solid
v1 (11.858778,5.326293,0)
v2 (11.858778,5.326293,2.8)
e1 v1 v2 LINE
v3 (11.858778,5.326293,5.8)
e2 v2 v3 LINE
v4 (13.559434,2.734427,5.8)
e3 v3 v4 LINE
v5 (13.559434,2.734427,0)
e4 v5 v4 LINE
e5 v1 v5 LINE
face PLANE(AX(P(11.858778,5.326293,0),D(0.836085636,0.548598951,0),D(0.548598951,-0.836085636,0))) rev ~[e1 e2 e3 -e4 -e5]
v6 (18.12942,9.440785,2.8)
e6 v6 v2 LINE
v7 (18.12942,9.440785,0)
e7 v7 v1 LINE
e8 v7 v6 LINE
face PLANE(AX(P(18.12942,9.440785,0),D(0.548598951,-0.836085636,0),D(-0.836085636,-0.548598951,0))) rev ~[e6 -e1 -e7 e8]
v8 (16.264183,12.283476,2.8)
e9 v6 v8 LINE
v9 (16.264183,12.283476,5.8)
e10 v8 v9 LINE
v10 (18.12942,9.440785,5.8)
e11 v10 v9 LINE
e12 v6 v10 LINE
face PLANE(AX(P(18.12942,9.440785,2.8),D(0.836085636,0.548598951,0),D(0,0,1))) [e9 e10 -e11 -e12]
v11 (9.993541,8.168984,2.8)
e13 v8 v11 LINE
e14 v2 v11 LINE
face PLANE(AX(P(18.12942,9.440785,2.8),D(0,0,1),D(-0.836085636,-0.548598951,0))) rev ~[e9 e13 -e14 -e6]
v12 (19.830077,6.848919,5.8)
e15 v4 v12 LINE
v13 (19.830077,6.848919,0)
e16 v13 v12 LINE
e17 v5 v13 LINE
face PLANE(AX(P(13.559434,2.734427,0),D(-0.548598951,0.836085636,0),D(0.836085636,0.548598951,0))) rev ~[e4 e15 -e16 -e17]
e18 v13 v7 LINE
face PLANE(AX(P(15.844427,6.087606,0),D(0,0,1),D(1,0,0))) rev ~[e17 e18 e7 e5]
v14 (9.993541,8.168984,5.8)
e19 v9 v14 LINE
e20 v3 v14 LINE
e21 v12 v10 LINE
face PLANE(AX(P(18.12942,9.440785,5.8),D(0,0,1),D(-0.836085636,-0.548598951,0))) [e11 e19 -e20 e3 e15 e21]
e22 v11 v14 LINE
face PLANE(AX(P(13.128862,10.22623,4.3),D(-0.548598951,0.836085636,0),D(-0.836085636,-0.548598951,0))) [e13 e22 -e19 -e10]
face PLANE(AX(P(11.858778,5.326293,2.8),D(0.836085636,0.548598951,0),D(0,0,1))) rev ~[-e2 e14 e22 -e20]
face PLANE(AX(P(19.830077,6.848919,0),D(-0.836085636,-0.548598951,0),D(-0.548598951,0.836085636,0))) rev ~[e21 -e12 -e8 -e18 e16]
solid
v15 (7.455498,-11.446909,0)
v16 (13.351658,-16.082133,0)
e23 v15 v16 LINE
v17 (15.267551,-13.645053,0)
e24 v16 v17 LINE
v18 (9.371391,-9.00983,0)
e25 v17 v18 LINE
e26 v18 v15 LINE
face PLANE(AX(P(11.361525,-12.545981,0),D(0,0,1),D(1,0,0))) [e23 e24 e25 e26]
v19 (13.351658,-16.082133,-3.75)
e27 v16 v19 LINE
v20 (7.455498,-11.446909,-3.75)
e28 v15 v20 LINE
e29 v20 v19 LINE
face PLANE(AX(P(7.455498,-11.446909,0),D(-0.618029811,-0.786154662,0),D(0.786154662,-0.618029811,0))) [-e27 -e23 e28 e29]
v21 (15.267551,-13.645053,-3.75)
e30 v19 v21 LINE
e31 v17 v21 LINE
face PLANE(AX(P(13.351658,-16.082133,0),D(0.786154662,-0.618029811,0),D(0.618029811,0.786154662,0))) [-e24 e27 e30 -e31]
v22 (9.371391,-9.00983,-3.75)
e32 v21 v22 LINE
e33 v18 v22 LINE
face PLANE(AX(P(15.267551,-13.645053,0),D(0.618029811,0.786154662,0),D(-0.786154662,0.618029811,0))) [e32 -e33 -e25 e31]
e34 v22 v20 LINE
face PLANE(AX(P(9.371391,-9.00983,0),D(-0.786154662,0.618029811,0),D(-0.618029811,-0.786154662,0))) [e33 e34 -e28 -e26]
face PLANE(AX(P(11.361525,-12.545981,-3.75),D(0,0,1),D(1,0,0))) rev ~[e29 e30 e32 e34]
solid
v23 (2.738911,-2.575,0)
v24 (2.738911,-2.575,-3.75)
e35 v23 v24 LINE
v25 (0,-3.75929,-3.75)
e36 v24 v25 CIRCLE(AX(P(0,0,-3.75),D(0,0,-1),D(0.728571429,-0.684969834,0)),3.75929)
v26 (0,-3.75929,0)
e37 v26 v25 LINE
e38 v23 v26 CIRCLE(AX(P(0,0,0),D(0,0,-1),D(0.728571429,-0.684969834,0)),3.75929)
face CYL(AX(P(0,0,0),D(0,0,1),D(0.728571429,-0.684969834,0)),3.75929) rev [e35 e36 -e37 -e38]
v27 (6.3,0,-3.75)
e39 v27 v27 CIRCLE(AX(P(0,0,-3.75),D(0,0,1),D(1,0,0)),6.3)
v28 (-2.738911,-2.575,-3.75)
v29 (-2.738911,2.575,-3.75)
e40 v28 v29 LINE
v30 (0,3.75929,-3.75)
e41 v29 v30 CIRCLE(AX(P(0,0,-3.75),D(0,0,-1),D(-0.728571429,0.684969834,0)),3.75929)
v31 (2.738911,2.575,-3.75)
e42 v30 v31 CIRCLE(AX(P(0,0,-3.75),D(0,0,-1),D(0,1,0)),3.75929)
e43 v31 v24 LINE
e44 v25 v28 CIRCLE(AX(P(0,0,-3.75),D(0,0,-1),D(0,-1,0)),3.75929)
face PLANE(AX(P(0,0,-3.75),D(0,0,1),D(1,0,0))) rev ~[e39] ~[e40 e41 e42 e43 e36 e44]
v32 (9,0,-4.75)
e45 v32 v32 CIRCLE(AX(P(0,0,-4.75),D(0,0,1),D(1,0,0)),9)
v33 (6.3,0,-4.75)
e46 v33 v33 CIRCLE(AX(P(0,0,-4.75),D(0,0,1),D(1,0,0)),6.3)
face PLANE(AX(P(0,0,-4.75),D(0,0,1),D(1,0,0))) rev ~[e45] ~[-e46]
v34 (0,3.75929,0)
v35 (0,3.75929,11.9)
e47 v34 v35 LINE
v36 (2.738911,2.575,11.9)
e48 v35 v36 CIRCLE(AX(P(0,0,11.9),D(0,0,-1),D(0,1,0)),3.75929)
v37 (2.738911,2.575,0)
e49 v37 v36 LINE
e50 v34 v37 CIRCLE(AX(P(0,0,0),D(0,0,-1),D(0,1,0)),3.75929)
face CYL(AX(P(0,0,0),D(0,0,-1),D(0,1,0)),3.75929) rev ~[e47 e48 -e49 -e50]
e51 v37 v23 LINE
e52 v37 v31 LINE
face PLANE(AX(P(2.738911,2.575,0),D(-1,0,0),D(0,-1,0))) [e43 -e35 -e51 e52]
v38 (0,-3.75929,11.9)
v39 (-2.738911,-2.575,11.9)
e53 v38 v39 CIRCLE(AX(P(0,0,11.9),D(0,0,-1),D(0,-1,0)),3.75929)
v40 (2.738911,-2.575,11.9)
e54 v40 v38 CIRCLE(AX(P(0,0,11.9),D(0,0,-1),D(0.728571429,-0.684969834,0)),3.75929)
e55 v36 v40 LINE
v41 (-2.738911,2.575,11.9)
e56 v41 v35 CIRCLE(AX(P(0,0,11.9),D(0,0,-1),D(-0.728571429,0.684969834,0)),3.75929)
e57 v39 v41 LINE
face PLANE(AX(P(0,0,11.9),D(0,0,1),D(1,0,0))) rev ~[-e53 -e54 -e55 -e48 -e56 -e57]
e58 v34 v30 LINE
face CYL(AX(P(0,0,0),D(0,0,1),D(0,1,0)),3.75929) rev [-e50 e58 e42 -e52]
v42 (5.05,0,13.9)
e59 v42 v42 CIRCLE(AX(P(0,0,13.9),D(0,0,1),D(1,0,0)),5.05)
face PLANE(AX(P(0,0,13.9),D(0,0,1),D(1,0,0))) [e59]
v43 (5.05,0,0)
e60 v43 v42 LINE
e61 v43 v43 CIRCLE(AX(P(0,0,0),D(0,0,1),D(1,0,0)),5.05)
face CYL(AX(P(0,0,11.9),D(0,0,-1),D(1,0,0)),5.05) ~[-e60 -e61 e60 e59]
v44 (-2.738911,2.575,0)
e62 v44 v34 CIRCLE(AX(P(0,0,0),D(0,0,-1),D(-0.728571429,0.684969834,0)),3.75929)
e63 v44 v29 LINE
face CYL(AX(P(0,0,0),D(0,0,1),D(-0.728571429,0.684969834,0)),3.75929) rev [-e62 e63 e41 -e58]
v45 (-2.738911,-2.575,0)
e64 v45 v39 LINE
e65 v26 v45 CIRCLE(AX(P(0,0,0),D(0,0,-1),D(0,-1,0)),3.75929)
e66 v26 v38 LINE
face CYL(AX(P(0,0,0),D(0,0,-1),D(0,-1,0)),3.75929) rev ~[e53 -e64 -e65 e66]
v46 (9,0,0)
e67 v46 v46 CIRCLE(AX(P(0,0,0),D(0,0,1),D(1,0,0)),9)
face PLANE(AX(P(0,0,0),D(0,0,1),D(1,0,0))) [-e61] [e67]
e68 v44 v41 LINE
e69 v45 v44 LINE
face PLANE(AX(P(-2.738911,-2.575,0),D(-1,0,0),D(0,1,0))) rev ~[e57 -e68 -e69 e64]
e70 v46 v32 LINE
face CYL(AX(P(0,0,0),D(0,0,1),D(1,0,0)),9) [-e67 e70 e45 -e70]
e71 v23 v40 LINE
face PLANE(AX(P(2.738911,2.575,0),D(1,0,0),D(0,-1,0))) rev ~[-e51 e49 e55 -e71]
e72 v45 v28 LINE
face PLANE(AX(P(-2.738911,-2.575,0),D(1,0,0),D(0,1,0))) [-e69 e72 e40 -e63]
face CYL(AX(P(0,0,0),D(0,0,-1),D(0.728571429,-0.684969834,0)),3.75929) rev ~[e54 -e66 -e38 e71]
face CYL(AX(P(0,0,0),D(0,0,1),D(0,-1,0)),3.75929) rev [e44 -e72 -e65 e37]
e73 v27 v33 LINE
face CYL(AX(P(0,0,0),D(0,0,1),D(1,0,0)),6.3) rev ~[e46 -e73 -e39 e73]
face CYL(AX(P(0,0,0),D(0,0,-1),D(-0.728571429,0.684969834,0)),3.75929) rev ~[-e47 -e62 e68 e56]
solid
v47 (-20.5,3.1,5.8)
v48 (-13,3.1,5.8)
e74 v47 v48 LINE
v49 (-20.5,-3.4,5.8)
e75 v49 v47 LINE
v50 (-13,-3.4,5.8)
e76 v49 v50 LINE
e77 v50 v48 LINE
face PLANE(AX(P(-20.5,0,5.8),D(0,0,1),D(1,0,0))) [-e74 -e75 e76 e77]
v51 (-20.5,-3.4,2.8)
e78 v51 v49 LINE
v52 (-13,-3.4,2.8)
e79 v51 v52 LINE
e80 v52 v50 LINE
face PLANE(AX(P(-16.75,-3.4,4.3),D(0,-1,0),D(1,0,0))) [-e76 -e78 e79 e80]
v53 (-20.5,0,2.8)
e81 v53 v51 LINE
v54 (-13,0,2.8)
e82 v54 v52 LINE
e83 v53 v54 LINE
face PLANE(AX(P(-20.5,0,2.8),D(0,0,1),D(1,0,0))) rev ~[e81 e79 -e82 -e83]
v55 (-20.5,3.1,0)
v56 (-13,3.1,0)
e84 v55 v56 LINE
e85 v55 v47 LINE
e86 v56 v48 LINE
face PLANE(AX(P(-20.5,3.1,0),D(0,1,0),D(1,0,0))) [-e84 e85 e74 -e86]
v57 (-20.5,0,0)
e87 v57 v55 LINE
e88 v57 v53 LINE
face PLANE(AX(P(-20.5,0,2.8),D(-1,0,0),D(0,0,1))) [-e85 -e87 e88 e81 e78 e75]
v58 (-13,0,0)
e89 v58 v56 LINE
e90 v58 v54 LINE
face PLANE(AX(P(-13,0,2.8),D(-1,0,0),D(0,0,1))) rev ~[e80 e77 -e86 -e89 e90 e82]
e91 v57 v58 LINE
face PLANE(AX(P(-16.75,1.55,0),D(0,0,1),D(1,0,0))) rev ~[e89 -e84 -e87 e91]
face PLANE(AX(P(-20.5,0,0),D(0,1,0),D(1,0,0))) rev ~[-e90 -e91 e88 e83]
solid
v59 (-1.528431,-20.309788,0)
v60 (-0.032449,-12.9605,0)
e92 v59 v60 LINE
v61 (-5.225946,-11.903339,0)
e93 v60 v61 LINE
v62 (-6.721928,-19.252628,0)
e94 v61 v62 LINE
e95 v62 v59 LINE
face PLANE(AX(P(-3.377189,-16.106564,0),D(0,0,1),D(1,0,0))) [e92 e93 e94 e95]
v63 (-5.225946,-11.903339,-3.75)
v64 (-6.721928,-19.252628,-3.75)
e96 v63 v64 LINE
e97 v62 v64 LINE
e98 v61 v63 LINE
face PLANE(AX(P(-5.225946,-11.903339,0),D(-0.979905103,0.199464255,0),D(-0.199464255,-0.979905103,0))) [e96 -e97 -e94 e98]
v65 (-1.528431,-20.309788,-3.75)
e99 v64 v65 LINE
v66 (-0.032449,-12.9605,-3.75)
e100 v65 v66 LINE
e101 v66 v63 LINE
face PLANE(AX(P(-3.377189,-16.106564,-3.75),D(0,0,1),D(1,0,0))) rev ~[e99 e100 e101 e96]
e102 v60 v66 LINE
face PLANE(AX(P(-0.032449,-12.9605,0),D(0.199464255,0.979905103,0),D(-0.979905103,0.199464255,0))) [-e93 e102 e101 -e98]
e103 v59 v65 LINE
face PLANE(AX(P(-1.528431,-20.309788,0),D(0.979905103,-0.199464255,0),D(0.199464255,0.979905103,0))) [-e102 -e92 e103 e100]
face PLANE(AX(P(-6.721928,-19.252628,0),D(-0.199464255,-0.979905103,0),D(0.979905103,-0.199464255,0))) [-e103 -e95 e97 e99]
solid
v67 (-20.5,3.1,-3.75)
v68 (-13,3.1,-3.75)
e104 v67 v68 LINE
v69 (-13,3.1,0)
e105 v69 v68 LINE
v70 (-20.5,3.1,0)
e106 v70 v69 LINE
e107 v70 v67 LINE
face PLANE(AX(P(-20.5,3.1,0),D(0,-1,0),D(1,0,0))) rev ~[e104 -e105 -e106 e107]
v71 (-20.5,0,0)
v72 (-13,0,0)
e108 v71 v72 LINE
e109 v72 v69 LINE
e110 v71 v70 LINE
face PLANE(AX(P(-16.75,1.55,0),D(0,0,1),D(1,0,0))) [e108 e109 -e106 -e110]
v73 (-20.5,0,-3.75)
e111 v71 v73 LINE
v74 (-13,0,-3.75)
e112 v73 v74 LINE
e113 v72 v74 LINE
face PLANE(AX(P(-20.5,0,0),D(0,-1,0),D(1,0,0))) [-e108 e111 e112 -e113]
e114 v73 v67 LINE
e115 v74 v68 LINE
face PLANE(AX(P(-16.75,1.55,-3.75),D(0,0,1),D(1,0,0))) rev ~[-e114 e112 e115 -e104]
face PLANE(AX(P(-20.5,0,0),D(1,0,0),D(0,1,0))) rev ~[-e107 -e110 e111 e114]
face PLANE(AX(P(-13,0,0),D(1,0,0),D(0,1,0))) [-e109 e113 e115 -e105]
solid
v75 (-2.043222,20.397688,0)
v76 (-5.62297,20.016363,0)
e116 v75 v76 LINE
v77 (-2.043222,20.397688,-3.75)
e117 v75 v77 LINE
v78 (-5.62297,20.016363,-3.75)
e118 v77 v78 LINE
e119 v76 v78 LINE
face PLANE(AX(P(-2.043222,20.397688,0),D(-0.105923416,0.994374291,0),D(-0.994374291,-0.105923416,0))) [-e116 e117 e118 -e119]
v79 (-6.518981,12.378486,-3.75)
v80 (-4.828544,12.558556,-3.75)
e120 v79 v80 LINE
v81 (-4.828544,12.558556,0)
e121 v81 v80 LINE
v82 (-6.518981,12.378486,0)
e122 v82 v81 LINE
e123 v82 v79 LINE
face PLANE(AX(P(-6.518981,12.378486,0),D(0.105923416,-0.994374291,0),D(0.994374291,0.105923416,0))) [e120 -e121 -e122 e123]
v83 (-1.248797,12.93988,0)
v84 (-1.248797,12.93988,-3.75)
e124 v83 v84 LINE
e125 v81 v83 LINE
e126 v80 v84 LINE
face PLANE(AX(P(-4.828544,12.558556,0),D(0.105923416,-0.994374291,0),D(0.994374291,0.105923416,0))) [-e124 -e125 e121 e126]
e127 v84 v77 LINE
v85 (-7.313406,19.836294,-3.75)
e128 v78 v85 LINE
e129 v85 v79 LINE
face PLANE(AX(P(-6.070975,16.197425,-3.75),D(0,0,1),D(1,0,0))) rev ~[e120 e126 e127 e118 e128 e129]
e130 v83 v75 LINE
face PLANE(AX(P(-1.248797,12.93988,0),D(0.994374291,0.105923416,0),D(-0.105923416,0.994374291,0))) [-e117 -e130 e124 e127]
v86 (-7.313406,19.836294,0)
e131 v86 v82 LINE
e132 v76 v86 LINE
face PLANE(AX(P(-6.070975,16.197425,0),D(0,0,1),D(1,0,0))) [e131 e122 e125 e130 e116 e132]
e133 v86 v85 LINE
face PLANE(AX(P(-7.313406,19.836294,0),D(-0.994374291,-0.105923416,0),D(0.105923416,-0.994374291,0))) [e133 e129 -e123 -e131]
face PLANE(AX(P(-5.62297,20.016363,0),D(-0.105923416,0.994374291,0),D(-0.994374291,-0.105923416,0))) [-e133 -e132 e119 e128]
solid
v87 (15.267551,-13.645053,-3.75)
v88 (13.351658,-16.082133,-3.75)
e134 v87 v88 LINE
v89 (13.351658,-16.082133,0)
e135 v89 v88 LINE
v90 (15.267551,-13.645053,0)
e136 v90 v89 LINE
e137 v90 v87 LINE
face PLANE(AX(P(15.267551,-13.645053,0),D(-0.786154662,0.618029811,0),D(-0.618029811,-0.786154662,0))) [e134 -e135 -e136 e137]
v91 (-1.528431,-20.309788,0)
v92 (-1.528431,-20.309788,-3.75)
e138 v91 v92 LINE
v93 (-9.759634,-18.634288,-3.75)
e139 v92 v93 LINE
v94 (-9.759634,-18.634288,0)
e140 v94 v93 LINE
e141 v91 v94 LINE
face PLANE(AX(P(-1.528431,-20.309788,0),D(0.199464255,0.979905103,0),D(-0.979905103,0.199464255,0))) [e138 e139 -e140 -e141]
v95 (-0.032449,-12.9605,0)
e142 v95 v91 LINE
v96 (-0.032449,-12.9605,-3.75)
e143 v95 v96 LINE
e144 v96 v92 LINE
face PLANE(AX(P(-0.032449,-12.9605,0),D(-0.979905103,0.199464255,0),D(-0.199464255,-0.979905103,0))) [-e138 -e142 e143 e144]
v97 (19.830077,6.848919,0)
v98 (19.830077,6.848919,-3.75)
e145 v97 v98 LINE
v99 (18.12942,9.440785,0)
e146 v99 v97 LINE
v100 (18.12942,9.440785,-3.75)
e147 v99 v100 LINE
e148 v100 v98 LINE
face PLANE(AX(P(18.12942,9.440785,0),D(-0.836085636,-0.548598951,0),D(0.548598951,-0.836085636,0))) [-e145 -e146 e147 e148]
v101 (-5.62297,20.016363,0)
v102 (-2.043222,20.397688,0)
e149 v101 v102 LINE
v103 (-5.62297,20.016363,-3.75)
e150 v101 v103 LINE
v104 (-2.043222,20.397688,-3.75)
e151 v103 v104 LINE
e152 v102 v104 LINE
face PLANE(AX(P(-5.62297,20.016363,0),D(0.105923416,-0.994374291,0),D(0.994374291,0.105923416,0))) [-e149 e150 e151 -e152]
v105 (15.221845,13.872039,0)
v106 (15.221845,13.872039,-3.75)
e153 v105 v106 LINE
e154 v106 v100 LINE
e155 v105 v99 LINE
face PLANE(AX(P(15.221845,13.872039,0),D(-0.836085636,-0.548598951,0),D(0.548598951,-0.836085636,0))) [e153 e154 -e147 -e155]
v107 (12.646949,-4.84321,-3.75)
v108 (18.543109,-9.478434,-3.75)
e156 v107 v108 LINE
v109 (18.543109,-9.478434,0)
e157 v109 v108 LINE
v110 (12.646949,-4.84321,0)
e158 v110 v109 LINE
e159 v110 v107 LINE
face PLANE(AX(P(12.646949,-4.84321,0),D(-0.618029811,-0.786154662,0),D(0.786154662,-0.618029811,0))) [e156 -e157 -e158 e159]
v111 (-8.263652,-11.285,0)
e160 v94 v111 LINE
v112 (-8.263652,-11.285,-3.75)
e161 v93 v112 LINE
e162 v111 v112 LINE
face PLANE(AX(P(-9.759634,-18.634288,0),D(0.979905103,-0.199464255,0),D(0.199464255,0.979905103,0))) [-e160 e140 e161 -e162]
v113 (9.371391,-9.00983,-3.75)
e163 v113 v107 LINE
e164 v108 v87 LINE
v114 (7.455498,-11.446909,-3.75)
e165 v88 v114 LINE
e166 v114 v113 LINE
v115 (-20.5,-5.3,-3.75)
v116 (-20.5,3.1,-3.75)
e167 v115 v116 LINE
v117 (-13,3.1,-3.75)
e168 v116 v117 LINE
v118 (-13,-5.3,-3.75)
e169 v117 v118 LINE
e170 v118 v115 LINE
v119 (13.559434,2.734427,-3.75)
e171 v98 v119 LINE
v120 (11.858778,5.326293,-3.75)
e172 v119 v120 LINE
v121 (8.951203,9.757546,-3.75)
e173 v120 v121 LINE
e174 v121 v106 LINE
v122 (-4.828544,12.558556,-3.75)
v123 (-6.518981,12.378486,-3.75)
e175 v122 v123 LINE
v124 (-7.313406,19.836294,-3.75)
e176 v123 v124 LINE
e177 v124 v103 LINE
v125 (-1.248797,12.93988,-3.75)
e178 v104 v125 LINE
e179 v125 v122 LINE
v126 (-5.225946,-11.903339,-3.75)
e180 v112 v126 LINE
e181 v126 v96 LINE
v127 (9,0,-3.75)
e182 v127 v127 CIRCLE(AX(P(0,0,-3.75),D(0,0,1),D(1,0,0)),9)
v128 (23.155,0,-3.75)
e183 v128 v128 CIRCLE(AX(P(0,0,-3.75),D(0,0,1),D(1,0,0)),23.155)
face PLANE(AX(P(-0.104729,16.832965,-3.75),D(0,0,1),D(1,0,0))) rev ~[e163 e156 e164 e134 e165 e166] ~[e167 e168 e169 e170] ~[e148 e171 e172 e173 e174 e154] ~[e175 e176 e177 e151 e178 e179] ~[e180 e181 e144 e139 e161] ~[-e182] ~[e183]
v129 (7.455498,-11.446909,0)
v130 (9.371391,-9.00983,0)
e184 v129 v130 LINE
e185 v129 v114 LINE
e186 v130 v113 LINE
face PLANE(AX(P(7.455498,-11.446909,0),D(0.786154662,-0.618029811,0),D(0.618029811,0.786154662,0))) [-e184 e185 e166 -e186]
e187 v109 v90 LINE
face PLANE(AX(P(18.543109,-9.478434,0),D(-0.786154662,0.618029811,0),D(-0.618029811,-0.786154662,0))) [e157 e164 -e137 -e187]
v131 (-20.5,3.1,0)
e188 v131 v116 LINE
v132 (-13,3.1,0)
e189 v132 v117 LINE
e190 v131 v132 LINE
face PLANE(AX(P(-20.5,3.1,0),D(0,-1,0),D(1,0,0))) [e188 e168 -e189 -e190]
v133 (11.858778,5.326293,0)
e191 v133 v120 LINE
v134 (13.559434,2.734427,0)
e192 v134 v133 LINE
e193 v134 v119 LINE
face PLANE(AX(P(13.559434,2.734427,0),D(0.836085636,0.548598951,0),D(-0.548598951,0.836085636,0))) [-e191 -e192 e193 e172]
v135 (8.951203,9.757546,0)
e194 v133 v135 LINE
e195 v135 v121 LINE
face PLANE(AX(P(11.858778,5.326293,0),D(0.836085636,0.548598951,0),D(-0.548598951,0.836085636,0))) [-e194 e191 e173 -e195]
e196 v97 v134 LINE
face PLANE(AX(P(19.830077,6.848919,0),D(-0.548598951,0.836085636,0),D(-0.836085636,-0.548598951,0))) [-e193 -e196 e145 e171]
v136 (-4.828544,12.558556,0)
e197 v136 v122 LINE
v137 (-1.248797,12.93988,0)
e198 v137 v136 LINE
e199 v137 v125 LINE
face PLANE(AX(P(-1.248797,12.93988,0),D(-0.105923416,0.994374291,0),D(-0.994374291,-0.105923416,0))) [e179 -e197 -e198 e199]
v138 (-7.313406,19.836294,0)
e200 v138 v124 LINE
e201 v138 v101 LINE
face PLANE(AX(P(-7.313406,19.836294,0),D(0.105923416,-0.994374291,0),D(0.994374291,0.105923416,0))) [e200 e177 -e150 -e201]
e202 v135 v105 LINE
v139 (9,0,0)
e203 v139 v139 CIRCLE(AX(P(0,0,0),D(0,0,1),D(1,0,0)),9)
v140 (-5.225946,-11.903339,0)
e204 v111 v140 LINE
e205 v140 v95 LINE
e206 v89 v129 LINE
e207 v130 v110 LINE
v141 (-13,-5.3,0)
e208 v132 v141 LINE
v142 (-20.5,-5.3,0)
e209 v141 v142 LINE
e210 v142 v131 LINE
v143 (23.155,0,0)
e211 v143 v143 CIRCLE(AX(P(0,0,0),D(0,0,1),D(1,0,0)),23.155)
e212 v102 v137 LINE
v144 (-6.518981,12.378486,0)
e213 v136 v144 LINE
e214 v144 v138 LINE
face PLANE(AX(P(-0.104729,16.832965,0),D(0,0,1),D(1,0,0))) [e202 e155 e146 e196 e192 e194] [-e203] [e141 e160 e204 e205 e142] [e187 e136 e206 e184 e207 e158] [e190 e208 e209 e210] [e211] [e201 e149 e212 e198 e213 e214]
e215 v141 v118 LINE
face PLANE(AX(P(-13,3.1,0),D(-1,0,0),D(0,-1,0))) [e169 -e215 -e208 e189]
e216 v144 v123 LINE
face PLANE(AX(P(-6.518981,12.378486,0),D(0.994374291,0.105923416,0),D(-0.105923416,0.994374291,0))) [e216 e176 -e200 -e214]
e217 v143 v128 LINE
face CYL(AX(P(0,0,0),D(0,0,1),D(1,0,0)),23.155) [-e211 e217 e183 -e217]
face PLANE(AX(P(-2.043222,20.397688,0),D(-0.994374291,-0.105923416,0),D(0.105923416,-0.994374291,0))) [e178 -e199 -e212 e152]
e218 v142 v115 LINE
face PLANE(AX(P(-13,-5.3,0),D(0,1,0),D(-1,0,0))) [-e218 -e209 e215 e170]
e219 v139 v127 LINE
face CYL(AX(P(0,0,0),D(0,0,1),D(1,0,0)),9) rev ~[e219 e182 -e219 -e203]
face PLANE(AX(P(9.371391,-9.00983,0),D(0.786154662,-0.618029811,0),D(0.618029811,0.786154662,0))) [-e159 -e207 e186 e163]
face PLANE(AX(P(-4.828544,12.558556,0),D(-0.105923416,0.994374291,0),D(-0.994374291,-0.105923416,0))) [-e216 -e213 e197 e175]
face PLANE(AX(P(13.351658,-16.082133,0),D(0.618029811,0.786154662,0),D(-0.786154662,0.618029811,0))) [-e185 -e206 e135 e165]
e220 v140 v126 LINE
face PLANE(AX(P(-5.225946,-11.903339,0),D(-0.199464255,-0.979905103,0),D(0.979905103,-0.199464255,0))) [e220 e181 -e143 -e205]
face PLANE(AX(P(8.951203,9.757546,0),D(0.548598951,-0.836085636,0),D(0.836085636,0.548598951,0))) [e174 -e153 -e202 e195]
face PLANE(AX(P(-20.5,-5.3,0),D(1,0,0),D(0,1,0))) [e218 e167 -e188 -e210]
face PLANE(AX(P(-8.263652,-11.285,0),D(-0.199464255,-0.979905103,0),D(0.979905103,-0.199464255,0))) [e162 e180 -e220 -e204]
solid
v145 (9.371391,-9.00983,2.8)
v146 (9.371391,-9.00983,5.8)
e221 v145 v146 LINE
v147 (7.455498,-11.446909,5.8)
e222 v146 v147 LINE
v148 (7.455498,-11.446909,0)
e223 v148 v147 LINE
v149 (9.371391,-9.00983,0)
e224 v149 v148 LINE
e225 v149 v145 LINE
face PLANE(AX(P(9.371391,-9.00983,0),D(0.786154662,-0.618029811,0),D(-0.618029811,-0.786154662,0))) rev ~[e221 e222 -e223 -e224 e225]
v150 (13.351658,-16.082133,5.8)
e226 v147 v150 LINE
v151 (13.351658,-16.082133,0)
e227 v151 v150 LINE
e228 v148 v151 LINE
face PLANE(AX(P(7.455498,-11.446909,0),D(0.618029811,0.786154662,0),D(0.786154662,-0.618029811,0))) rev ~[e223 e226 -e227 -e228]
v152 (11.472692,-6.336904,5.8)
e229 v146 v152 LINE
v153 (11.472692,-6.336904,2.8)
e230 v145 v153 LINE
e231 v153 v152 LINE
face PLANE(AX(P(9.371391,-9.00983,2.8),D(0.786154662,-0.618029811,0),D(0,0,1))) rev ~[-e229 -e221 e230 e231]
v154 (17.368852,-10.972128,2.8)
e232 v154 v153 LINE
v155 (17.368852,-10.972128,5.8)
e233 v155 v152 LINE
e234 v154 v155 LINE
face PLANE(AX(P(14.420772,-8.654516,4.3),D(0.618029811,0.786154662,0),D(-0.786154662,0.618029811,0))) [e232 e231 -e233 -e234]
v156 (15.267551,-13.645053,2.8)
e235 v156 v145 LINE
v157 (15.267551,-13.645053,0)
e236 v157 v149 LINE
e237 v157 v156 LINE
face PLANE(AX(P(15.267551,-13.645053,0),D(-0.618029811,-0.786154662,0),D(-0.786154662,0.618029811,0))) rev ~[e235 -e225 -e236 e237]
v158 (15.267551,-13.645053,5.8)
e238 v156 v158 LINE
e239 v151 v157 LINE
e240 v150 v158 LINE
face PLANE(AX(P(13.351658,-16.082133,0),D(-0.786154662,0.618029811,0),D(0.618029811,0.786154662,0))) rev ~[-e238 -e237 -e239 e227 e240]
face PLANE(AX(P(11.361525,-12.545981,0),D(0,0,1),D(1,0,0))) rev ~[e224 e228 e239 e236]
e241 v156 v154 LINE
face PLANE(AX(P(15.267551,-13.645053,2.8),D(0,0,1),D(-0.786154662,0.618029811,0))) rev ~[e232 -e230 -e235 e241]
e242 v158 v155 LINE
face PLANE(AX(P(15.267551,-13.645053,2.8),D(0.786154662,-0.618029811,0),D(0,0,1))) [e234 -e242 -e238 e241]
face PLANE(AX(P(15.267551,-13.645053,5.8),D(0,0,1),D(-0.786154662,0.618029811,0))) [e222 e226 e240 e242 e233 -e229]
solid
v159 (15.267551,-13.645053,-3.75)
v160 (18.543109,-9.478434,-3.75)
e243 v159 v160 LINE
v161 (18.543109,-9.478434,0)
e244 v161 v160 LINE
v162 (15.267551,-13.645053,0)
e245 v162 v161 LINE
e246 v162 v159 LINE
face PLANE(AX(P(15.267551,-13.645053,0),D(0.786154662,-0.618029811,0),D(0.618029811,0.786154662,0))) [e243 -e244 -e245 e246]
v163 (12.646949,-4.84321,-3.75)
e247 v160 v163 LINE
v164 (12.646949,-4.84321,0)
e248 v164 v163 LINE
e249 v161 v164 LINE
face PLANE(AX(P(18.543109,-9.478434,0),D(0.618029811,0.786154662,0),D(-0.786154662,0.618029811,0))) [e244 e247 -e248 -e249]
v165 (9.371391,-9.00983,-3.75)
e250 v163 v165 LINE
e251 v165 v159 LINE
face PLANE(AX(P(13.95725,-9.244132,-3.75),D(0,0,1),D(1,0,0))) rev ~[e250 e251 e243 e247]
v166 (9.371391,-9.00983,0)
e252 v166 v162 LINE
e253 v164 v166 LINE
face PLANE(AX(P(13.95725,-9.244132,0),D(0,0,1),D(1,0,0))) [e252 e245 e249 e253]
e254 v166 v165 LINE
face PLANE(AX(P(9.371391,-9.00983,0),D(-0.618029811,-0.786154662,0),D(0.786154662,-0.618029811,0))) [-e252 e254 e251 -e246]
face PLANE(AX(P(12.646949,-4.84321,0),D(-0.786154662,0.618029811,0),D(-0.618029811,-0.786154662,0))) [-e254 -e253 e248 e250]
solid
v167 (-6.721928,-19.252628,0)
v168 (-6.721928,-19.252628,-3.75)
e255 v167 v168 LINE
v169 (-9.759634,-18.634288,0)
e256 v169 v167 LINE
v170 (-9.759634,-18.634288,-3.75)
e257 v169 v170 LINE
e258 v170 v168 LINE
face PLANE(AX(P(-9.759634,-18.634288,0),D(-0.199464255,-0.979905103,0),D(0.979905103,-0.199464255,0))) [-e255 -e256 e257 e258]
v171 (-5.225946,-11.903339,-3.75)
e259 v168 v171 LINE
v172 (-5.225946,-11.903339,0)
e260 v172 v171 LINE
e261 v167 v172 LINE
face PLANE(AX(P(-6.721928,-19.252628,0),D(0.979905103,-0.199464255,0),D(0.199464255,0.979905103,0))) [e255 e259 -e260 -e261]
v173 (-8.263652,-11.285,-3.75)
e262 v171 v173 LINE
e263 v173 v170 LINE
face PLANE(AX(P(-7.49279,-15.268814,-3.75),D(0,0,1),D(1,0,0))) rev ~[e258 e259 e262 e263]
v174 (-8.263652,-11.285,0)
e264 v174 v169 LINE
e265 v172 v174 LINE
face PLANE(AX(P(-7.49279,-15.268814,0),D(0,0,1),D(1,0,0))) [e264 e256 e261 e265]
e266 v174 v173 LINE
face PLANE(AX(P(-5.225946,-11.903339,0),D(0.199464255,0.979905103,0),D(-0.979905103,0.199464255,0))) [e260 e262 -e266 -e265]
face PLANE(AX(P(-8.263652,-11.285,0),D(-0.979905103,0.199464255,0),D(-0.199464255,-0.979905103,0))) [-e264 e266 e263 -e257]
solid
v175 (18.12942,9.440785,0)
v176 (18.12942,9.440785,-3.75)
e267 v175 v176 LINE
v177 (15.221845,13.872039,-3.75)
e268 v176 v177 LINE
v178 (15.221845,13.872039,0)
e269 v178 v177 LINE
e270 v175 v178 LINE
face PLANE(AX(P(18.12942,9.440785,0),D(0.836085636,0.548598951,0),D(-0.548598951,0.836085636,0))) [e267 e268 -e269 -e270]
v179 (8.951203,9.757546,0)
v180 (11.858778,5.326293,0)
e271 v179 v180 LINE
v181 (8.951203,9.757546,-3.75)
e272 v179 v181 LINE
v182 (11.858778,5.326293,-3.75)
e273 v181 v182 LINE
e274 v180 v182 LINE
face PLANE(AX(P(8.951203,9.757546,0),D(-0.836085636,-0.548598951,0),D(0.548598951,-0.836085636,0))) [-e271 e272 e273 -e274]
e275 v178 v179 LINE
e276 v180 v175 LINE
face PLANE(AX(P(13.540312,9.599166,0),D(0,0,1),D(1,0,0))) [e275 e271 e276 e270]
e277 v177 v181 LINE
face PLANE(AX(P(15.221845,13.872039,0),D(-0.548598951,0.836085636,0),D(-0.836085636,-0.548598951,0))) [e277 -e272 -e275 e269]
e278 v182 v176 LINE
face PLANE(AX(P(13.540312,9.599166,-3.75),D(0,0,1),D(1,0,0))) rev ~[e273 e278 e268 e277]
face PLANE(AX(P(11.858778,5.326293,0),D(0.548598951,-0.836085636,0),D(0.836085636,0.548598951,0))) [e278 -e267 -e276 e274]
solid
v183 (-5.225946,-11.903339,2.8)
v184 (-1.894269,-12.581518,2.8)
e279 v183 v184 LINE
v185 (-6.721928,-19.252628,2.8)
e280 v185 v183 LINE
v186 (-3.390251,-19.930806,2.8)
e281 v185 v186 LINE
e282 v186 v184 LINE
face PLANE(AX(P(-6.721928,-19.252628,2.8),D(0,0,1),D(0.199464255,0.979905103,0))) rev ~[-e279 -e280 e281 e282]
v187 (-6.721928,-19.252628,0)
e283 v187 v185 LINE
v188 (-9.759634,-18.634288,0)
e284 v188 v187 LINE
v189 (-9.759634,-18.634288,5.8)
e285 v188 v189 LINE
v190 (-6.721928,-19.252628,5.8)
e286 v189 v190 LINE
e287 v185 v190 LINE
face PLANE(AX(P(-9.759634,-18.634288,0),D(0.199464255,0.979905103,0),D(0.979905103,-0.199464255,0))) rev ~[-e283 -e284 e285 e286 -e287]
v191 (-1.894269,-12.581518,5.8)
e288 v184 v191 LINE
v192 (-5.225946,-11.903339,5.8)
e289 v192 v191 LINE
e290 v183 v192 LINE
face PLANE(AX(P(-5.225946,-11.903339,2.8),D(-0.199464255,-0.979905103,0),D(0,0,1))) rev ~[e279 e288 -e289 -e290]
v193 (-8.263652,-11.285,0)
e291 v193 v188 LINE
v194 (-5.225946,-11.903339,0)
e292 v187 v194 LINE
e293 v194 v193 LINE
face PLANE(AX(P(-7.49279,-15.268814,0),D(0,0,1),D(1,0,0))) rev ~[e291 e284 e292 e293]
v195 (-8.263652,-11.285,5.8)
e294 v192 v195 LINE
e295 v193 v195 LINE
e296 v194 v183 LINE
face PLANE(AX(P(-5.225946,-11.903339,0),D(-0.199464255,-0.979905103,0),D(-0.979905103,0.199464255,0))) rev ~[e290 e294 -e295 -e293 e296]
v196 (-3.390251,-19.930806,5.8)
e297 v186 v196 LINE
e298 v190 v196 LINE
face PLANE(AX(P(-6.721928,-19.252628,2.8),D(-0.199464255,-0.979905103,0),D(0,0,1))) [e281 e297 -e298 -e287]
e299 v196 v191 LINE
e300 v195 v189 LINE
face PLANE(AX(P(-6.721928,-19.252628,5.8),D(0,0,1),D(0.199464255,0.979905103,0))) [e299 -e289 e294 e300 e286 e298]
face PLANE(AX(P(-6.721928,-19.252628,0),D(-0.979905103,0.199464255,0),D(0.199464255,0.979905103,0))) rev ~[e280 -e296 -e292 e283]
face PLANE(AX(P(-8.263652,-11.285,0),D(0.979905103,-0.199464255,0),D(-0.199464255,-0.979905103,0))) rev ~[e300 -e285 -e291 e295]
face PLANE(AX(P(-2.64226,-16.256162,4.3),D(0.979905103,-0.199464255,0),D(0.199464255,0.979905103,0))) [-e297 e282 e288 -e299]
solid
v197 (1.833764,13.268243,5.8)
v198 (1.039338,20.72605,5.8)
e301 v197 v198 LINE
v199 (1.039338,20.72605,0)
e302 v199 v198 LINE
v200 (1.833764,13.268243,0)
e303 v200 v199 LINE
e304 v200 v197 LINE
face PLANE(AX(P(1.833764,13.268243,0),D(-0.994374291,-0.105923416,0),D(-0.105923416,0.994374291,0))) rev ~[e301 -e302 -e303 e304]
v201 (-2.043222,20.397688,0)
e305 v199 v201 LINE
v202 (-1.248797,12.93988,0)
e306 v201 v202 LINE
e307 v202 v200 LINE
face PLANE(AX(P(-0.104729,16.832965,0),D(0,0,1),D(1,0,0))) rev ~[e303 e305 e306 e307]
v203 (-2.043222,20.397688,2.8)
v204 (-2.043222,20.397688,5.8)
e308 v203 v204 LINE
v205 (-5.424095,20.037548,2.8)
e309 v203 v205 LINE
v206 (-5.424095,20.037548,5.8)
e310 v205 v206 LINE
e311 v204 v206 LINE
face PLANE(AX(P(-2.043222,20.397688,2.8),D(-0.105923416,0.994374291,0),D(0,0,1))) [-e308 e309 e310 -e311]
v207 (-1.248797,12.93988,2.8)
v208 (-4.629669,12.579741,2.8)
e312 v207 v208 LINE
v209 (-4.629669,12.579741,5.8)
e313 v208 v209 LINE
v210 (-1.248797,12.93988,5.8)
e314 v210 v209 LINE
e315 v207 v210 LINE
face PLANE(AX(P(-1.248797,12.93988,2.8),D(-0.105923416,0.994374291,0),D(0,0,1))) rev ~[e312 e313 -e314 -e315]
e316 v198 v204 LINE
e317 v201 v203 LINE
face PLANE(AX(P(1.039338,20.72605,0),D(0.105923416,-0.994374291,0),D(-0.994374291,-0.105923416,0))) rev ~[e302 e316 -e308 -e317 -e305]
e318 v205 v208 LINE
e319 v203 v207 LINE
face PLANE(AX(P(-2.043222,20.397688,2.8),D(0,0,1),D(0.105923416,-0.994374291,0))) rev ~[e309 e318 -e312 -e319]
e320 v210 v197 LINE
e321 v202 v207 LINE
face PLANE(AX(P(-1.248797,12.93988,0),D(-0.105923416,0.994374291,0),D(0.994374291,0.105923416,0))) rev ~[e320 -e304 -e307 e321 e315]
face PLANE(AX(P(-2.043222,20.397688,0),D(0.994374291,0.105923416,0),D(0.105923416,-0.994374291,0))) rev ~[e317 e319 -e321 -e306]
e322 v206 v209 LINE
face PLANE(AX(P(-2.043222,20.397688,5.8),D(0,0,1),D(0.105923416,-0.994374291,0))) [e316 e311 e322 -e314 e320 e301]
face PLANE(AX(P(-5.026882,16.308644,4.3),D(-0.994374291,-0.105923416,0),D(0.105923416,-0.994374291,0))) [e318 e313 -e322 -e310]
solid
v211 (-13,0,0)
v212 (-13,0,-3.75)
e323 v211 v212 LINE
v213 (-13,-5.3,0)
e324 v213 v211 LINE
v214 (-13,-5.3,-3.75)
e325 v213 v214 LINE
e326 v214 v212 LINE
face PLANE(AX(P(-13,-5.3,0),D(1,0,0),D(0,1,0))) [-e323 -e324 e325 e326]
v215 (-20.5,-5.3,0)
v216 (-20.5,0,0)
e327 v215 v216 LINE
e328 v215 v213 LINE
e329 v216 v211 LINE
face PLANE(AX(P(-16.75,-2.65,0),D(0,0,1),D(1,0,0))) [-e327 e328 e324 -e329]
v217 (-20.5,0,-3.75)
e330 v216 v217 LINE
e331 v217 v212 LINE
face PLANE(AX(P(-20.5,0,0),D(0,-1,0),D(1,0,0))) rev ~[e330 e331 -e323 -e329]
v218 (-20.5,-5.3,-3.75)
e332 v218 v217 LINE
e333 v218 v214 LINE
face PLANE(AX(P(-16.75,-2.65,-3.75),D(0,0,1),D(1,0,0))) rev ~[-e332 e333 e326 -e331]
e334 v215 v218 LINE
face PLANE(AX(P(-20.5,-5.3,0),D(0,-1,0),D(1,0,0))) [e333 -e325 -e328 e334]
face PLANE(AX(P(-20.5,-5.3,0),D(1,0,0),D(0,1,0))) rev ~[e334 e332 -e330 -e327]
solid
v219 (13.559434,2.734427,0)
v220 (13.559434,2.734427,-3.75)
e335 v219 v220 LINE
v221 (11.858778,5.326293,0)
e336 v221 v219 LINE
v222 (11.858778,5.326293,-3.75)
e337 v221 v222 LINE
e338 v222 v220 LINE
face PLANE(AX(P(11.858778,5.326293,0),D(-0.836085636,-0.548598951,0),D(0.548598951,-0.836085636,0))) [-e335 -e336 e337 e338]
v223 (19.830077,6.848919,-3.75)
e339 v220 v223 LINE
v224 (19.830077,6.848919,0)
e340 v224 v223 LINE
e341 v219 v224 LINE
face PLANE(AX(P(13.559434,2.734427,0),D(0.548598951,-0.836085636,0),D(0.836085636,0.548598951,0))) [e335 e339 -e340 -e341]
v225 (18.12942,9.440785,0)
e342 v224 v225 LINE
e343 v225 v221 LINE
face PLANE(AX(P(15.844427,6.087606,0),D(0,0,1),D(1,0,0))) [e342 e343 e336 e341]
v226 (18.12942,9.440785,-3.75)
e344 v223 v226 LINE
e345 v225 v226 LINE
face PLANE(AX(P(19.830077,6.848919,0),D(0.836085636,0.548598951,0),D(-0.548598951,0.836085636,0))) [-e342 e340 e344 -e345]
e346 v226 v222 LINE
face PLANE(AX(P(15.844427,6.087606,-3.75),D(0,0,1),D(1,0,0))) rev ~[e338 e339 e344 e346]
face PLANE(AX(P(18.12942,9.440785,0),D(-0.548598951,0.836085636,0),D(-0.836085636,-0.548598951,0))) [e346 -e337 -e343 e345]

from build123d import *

# Parameters (mm, degrees)
F0_R      = 23.155
F0_R_2    = 9
F1_DEPTH  = 3.75
F0_R_3    = 6.3
F2_DEPTH  = 4.75
F3_DEPTH  = 5.8
F4_DEPTH  = 3.75
F5_W      = 7.5
F5_H      = 3
F6_DEPTH  = 3.4
F0_W      = 7.5
F0_H      = 3.1
F7_DEPTH  = 5.8
F8_W      = 7.5
F8_H      = 3
F9_DEPTH  = 3.4
F10_W     = 7.5
F10_H     = 3
F11_DEPTH = 3.4
F12_DEPTH = 3.75
F13_W     = 7.5
F13_H     = 3
F14_DEPTH = 3.4
F15_W     = 7.5
F15_H     = 3
F16_DEPTH = 3.4
F0_R_4    = 5.05
F17_DEPTH = 3.75
F18_DEPTH = 3.75
F19_DEPTH = 11.9
F20_R     = 5.05
F21_DEPTH = 2
F22_DEPTH = 3.75
F0_H_2    = 5.3


with BuildPart() as f1:
    # F0 (on Top) → F1 (new body)
    with BuildSketch(Plane.XY):
        Circle(F0_R)
        Polygon((-8.2636521274, -11.2850000563), (-5.2259463077, -11.9033392453), (-0.032449261, -12.9604997943), (-1.5284311699, -20.3097880678), (-6.7219282165, -19.2526275189), (-9.7596340363, -18.6342883299), align=None, mode=Mode.SUBTRACT)
        Polygon((-13, 3.1), (-13, 0), (-13, -5.3), (-20.5, -5.3), (-20.5, 0), (-20.5, 3.1), align=None, mode=Mode.SUBTRACT)
        Polygon((7.4554983603, -11.4469093574), (9.3713907755, -9.0098299058), (12.6469487758, -4.8432101983), (18.5431087392, -9.4784337836), (15.267550739, -13.6450534911), (13.3516583238, -16.0821329427), align=None, mode=Mode.SUBTRACT)
        Polygon((1.8337635187, 13.2682430609), (-1.2487967823, 12.9398804707), (-4.8285442287, 12.5585561724), (-6.5189805228, 12.3784863649), (-7.3134061442, 19.8362935448), (-5.6229698501, 20.0163633523), (-2.0432224037, 20.3976876506), (1.0393378973, 20.7260502408), align=None, mode=Mode.SUBTRACT)
        Circle(F0_R_2, mode=Mode.SUBTRACT)
        Polygon((13.5594344097, 2.734427086), (11.8587776603, 5.3262925571), (8.9512032177, 9.7575464271), (15.2218454866, 13.8720385629), (18.1294199292, 9.4407846929), (19.8300766787, 6.8489192217), align=None, mode=Mode.SUBTRACT)
    extrude(amount=-F1_DEPTH)

    # F0 (on Top) → F4 (join)
    with BuildSketch(Plane.XY):
        Polygon((-2.0432224037, 20.3976876506), (-1.2487967823, 12.9398804707), (1.8337635187, 13.2682430609), (1.0393378973, 20.7260502408), align=None)
    extrude(amount=-F4_DEPTH)


with BuildPart() as f2:
    # F0 (on Top) → F2 (new body)
    with BuildSketch(Plane.XY):
        Circle(F0_R_2)
        Circle(F0_R_3, mode=Mode.SUBTRACT)
    extrude(amount=-F2_DEPTH)

    # F0 (on Top) → F17 (join)
    with BuildSketch(Plane.XY):
        Circle(F0_R_3)
        Circle(F0_R_4, mode=Mode.SUBTRACT)
    extrude(amount=-F17_DEPTH)

    # F0 (on Top) → F18 (join)
    with BuildSketch(Plane.XY):
        Circle(F0_R_4)
        with BuildLine():
            Line((2.7389110228, 2.575), (2.7389110228, -2.575))
            ThreePointArc((2.7389110228, -2.575), (1.491993259, -3.4505383211), (0, -3.7592896391))
            ThreePointArc((0, -3.7592896391), (-1.491993259, -3.4505383211), (-2.7389110228, -2.575))
            Line((-2.7389110228, -2.575), (-2.7389110228, 2.575))
            ThreePointArc((-2.7389110228, 2.575), (-1.491993259, 3.4505383211), (0, 3.7592896391))
            ThreePointArc((0, 3.7592896391), (1.491993259, 3.4505383211), (2.7389110228, 2.575))
        make_face(mode=Mode.SUBTRACT)
    extrude(amount=-F18_DEPTH)

    # F0 (on Top) → F19 (join)
    with BuildSketch(Plane.XY):
        Circle(F0_R_4)
        with BuildLine():
            Line((2.7389110228, 2.575), (2.7389110228, -2.575))
            ThreePointArc((2.7389110228, -2.575), (1.491993259, -3.4505383211), (0, -3.7592896391))
            ThreePointArc((0, -3.7592896391), (-1.491993259, -3.4505383211), (-2.7389110228, -2.575))
            Line((-2.7389110228, -2.575), (-2.7389110228, 2.575))
            ThreePointArc((-2.7389110228, 2.575), (-1.491993259, 3.4505383211), (0, 3.7592896391))
            ThreePointArc((0, 3.7592896391), (1.491993259, 3.4505383211), (2.7389110228, 2.575))
        make_face(mode=Mode.SUBTRACT)
    extrude(amount=F19_DEPTH)

    # F20 (on face) → F21 (join)
    with BuildSketch(Plane.XY.offset(11.9)):
        Circle(F20_R)
        with BuildLine():
            Line((-2.7389110228, -2.575), (-2.7389110228, 2.575))
            ThreePointArc((-2.7389110228, 2.575), (0, 3.7592896391), (2.7389110228, 2.575))
            Line((2.7389110228, 2.575), (2.7389110228, -2.575))
            ThreePointArc((2.7389110228, -2.575), (0, -3.7592896391), (-2.7389110228, -2.575))
        make_face(mode=Mode.SUBTRACT)
        with BuildLine():
            ThreePointArc((2.7389110228, 2.575), (0, 3.7592896391), (-2.7389110228, 2.575))
            Line((-2.7389110228, 2.575), (-2.7389110228, -2.575))
            ThreePointArc((-2.7389110228, -2.575), (0, -3.7592896391), (2.7389110228, -2.575))
            Line((2.7389110228, -2.575), (2.7389110228, 2.575))
        make_face()
    extrude(amount=F21_DEPTH)


with BuildPart() as f3:
    # F0 (on Top) → F3 (new body)
    with BuildSketch(Plane.XY):
        Polygon((-2.0432224037, 20.3976876506), (-1.2487967823, 12.9398804707), (1.8337635187, 13.2682430609), (1.0393378973, 20.7260502408), align=None)
    extrude(amount=F3_DEPTH)

    # F5 (on face) → F6 (join)
    with BuildSketch(Plane(origin=(0.1281399733, 0.0136498136, 0), x_dir=(0.1059234162, -0.9943742906, 0), z_dir=(-0.9943742906, -0.1059234162, 0))):
        with Locations((-16.7493612855, 4.3)):
            Rectangle(F5_W, F5_H)
    extrude(amount=F6_DEPTH)


with BuildPart() as f7:
    # F0 (on Top) → F7 (new body)
    with BuildSketch(Plane.XY):
        with Locations((-16.75, 1.55)):
            Rectangle(F0_W, F0_H)
    extrude(amount=F7_DEPTH)

    # F8 (on face) → F9 (join)
    with BuildSketch(Plane.XZ):
        with Locations((-16.75, 4.3)):
            Rectangle(F8_W, F8_H)
    extrude(amount=F9_DEPTH)


with BuildPart() as f7b:
    # F0 (on Top) → F7, piece 2 (new body)
    with BuildSketch(Plane.XY):
        Polygon((18.1294199292, 9.4407846929), (11.8587776603, 5.3262925571), (13.5594344097, 2.734427086), (19.8300766787, 6.8489192217), align=None)
    extrude(amount=F7_DEPTH)

    # F15 (on face) → F16 (join)
    with BuildSketch(Plane(origin=(1.1259863408, -1.7160459443, 0), x_dir=(-0.8360856359, -0.5485989514, 0), z_dir=(-0.5485989514, 0.8360856359, 0))):
        with Locations((-16.5869521724, 4.3)):
            Rectangle(F15_W, F15_H)
    extrude(amount=F16_DEPTH)


with BuildPart() as f7c:
    # F0 (on Top) → F7, piece 3 (new body)
    with BuildSketch(Plane.XY):
        Polygon((15.267550739, -13.6450534911), (9.3713907755, -9.0098299058), (7.4554983603, -11.4469093574), (13.3516583238, -16.0821329427), align=None)
    extrude(amount=F7_DEPTH)

    # F13 (on face) → F14 (join)
    with BuildSketch(Plane(origin=(-0.7980748179, -1.0151779526, 0), x_dir=(-0.7861546618, 0.6180298114, 0), z_dir=(0.6180298114, 0.7861546618, 0))):
        with Locations((-16.6857060228, 4.3)):
            Rectangle(F13_W, F13_H)
    extrude(amount=F14_DEPTH)


with BuildPart() as f7d:
    # F0 (on Top) → F7, piece 4 (new body)
    with BuildSketch(Plane.XY):
        Polygon((-6.7219282165, -19.2526275189), (-5.2259463077, -11.9033392453), (-8.2636521274, -11.2850000563), (-9.7596340363, -18.6342883299), align=None)
    extrude(amount=F7_DEPTH)

    # F10 (on face) → F11 (join)
    with BuildSketch(Plane(origin=(-2.6914473039, 0.547856653, 0), x_dir=(0.1994642545, 0.9799051031, 0), z_dir=(0.9799051031, -0.1994642545, 0))):
        with Locations((-16.4565323554, 4.3)):
            Rectangle(F10_W, F10_H)
    extrude(amount=F11_DEPTH)


with BuildPart() as f12:
    # F0 (on Top) → F12 (new body)
    with BuildSketch(Plane.XY):
        with Locations((-16.75, 1.55)):
            Rectangle(F0_W, F0_H)
    extrude(amount=-F12_DEPTH)


with BuildPart() as f12b:
    # F0 (on Top) → F12, piece 2 (new body)
    with BuildSketch(Plane.XY):
        Polygon((-6.7219282165, -19.2526275189), (-5.2259463077, -11.9033392453), (-8.2636521274, -11.2850000563), (-9.7596340363, -18.6342883299), align=None)
    extrude(amount=-F12_DEPTH)


with BuildPart() as f12c:
    # F0 (on Top) → F12, piece 3 (new body)
    with BuildSketch(Plane.XY):
        Polygon((18.1294199292, 9.4407846929), (11.8587776603, 5.3262925571), (13.5594344097, 2.734427086), (19.8300766787, 6.8489192217), align=None)
    extrude(amount=-F12_DEPTH)


with BuildPart() as f12d:
    # F0 (on Top) → F12, piece 4 (new body)
    with BuildSketch(Plane.XY):
        Polygon((15.267550739, -13.6450534911), (9.3713907755, -9.0098299058), (7.4554983603, -11.4469093574), (13.3516583238, -16.0821329427), align=None)
    extrude(amount=-F12_DEPTH)


with BuildPart() as f22:
    # F0 (on Top) → F22 (new body)
    with BuildSketch(Plane.XY):
        Polygon((-6.5189805228, 12.3784863649), (-4.8285442287, 12.5585561724), (-5.6229698501, 20.0163633523), (-7.3134061442, 19.8362935448), align=None)
        Polygon((-4.8285442287, 12.5585561724), (-1.2487967823, 12.9398804707), (-2.0432224037, 20.3976876506), (-5.6229698501, 20.0163633523), align=None)
    extrude(amount=-F22_DEPTH)


with BuildPart() as f22b:
    # F0 (on Top) → F22, piece 2 (new body)
    with BuildSketch(Plane.XY):
        with Locations((-16.75, -2.65)):
            Rectangle(F0_W, F0_H_2)
    extrude(amount=-F22_DEPTH)


with BuildPart() as f22c:
    # F0 (on Top) → F22, piece 3 (new body)
    with BuildSketch(Plane.XY):
        Polygon((-0.032449261, -12.9604997943), (-5.2259463077, -11.9033392453), (-6.7219282165, -19.2526275189), (-1.5284311699, -20.3097880678), align=None)
    extrude(amount=-F22_DEPTH)


with BuildPart() as f22d:
    # F0 (on Top) → F22, piece 4 (new body)
    with BuildSketch(Plane.XY):
        Polygon((12.6469487758, -4.8432101983), (9.3713907755, -9.0098299058), (15.267550739, -13.6450534911), (18.5431087392, -9.4784337836), align=None)
    extrude(amount=-F22_DEPTH)


with BuildPart() as f22e:
    # F0 (on Top) → F22, piece 5 (new body)
    with BuildSketch(Plane.XY):
        Polygon((8.9512032177, 9.7575464271), (11.8587776603, 5.3262925571), (18.1294199292, 9.4407846929), (15.2218454866, 13.8720385629), align=None)
    extrude(amount=-F22_DEPTH)


solid = Compound([f1.part, f2.part, f3.part, f7.part, f7b.part, f7c.part, f7d.part, f12.part, f12b.part, f12c.part, f12d.part, f22.part, f22b.part, f22c.part, f22d.part, f22e.part])
